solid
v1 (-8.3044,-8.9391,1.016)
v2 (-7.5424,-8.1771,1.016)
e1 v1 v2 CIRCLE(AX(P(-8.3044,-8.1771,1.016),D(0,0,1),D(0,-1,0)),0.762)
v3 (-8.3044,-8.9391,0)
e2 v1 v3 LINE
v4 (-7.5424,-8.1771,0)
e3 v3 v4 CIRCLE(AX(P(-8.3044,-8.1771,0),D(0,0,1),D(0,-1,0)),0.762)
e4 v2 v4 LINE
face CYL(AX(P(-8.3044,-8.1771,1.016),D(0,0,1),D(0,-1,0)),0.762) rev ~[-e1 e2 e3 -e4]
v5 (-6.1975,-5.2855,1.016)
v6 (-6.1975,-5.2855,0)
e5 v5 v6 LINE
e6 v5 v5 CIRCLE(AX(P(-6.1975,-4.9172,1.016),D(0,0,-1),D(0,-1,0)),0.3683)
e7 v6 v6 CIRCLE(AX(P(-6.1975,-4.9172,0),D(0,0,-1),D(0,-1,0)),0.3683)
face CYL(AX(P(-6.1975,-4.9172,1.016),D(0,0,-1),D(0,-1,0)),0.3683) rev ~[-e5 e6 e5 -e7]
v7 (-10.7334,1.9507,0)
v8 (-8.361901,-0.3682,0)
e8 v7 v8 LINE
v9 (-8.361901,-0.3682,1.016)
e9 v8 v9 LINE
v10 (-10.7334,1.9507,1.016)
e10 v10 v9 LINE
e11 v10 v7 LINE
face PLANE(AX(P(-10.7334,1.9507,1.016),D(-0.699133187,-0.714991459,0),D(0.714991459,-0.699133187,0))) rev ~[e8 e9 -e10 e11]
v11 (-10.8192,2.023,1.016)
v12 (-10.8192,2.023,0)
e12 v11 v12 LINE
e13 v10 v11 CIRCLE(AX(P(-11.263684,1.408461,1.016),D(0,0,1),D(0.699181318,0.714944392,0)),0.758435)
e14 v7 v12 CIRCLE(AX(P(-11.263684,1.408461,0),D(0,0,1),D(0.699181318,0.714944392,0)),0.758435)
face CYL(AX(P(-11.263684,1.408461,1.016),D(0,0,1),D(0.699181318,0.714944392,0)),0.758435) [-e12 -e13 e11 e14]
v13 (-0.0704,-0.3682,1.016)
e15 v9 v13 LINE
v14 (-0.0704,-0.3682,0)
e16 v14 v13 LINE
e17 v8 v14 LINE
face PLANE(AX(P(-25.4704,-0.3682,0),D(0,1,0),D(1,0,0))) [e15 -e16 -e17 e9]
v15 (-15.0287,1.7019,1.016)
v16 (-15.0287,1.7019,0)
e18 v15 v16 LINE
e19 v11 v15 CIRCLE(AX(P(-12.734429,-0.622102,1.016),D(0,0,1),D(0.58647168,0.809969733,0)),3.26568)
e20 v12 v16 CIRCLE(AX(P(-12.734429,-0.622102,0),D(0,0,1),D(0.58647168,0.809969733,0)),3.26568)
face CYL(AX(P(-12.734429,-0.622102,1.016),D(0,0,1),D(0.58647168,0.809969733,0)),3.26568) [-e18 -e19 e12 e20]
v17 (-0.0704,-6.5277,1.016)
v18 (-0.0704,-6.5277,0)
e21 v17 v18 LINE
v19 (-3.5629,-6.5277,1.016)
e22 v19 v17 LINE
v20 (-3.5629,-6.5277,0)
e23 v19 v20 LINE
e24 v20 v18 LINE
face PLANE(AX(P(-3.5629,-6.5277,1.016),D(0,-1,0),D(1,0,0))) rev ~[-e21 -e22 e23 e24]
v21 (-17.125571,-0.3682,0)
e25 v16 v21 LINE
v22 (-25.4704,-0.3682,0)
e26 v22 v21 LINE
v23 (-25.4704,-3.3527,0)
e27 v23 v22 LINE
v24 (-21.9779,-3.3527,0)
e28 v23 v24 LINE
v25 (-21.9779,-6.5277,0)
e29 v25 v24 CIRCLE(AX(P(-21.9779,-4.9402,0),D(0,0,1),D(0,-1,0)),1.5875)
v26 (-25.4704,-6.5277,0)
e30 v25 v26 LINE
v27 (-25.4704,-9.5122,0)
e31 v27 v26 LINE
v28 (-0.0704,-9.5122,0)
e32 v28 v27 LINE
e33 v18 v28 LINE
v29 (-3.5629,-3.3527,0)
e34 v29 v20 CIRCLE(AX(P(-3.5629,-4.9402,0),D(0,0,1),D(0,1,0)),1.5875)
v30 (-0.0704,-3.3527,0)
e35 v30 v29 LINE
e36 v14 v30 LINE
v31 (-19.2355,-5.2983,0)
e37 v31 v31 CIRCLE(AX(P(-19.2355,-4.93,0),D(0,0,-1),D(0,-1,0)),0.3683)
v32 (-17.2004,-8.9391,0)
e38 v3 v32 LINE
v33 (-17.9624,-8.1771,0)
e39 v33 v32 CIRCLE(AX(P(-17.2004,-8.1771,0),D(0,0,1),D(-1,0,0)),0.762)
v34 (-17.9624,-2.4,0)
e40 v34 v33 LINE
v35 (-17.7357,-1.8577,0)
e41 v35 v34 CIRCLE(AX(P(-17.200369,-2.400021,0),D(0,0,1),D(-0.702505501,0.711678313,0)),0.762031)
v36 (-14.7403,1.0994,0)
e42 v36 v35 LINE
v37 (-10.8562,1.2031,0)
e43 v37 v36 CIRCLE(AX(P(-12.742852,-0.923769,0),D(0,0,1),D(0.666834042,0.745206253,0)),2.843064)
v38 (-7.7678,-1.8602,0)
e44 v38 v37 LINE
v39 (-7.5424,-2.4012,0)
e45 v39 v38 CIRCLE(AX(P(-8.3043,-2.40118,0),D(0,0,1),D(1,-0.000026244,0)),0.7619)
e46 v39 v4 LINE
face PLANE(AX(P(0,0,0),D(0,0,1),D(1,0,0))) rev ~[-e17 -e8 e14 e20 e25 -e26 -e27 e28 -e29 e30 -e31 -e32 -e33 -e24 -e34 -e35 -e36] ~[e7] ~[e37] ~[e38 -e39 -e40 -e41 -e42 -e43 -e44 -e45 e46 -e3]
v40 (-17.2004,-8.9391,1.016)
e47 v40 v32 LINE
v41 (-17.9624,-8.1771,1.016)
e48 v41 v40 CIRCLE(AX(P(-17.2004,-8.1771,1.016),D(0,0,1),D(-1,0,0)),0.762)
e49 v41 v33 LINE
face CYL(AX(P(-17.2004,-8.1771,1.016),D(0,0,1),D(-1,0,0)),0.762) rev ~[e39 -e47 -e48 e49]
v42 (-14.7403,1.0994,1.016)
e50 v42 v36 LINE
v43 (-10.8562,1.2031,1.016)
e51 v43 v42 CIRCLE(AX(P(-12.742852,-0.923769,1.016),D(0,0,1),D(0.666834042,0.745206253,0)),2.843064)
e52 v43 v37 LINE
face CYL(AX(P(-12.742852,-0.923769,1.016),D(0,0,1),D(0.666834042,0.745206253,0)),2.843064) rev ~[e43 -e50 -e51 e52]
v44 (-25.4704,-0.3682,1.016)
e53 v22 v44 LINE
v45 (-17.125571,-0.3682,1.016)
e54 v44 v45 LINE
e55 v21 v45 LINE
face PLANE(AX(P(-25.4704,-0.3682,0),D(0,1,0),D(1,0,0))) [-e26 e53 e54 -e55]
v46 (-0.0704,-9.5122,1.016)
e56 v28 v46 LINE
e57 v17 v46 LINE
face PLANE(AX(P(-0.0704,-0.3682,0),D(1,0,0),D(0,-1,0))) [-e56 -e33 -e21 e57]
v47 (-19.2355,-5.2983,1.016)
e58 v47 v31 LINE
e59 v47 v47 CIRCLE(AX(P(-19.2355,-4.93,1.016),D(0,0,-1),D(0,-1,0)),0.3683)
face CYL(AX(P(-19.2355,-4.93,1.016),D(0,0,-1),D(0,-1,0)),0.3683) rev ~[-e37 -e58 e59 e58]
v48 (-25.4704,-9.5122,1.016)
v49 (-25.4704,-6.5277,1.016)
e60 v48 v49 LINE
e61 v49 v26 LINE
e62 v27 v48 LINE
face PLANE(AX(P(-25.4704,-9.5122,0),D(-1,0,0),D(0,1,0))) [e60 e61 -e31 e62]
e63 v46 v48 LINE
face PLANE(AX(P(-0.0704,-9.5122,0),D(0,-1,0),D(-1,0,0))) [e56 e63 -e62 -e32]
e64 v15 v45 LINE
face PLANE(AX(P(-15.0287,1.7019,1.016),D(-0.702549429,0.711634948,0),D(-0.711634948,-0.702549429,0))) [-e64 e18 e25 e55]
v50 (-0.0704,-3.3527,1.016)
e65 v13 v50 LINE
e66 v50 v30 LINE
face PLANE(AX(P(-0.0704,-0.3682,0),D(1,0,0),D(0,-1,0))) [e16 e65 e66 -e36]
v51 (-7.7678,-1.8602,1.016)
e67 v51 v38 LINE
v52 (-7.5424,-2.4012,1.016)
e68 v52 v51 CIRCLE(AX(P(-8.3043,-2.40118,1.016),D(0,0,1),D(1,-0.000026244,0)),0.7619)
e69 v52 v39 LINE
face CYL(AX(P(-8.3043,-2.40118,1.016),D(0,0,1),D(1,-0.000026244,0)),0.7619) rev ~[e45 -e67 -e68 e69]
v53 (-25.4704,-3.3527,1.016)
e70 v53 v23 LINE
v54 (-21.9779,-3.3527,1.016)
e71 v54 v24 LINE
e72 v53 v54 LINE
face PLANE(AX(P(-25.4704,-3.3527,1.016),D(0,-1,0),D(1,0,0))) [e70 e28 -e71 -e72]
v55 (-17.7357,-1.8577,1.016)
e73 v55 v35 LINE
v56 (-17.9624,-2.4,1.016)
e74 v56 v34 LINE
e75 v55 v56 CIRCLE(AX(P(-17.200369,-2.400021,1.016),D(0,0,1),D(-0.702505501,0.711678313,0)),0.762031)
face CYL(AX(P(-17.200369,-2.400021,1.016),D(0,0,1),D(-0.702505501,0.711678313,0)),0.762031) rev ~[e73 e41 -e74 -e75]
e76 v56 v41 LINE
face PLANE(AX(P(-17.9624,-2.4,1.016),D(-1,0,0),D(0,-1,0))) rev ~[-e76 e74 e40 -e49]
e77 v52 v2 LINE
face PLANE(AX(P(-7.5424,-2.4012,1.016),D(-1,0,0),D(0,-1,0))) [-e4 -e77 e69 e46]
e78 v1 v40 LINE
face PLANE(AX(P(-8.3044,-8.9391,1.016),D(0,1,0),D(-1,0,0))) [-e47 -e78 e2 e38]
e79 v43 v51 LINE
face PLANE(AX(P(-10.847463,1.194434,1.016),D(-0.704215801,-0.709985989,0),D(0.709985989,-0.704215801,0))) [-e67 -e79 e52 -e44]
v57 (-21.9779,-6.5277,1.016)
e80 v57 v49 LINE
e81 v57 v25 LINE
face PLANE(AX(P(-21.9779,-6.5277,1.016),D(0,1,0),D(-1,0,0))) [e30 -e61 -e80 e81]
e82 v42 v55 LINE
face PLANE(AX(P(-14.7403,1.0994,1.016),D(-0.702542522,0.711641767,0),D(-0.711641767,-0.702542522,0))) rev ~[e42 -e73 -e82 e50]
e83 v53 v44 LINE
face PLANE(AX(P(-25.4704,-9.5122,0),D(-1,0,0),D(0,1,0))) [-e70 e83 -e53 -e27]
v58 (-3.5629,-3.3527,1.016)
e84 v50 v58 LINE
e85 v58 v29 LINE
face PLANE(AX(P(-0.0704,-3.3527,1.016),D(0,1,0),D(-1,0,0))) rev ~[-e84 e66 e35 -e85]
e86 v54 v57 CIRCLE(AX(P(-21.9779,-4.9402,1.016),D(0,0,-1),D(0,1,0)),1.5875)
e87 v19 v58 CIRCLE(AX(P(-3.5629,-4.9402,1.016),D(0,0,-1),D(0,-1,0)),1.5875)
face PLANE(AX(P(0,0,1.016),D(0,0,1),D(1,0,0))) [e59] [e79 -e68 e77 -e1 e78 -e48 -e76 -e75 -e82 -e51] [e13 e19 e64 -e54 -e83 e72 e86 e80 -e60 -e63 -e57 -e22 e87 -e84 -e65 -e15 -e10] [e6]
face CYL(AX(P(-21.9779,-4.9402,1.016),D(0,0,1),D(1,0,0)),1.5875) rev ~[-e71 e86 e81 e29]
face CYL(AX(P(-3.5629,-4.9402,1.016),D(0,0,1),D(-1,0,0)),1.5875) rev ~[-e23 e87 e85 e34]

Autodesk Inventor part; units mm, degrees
ref_plane "YZ Plane" through (0, 0, 0) normal (1, 0, 0) x (0, 1, 0)
ref_plane "XZ Plane" through (0, 0, 0) normal (0, 1, 0) x (-1, 0, 0)
ref_plane "XY Plane" through (0, 0, 0) normal (0, 0, 1) x (1, 0, 0)
sketch "Block1" plane through (0, 0, 0) normal (0, 0, 1) x (1, 0, 0)
  line L0 (-17.5911, -8.406) -> (-17.5911, -2.6569)
  arc A0 (-15.6308, 0.6431) -> (-17.4939, -2.2845) centre (9.5285, -17.4245) ccw
  arc A1 (-17.4939, -2.2845) -> (-17.5911, -2.6569) centre (-16.8291, -2.6569) ccw
  line L1 (-13.0521, -3.6322) -> (-2.9855, -3.6322)
  line L2 (-2.9855, -3.6322) -> (-2.9855, -10.0136)
  line L3 (-2.9855, -10.0136) -> (-13.0521, -10.0136)
  line L4 (-13.0521, -10.0136) -> (-13.0521, -3.6322)
  ellipse E0 centre (-8.0188, -3.6322) end of major axis (-8.0188, -7.4704) minor radius 2.9685
  point P0 (-13.9703, -5.5207)
  point P1 (-17.5911, -2.4593)
  dimension "d111" = 0.762
sketch "Block2" plane through (0, 0, 0) normal (0, 0, 1) x (1, 0, 0)
  line L0 (-7.8958, -2.4967) -> (-7.8958, -8.4058)
  line L1 (-8.6339, -9.168) -> (-16.8291, -9.168)
  ellipse E0 centre (-12.6564, -2.1178) end of major axis (-12.6564, -6.4967) minor radius 3.853 (-9.6585, 0.6329) -> (-15.6415, 0.6509) ccw
  arc A0 (-7.8958, -2.4967) -> (-9.6091, 0.6391) centre (-35.8892, -15.7554) ccw
  line L2 (-17.6018, -8.3981) -> (-17.6018, -2.6491)
  arc A1 (-15.6415, 0.6509) -> (-17.5045, -2.2766) centre (9.5178, -17.4167) ccw
  arc A2 (-17.5045, -2.2766) -> (-17.6018, -2.6491) centre (-16.8398, -2.6491) ccw
  line L3 (-13.0627, -3.6243) -> (-2.9962, -3.6243)
  line L4 (-2.9962, -3.6243) -> (-2.9962, -10.0058)
  line L5 (-2.9962, -10.0058) -> (-13.0627, -10.0058)
  line L6 (-13.0627, -10.0058) -> (-13.0627, -3.6243)
  ellipse E1 centre (-8.0295, -3.6243) end of major axis (-8.0295, -7.4625) minor radius 2.9685
  point P0 (-12.2397, -5.1213)
sketch "Block3" plane through (0, 0, 0) normal (0, 0, 1) x (1, 0, 0)
  arc A0 (-17.5911, -8.406) -> (-16.8291, -9.168) centre (-16.8291, -8.406) ccw
  arc A1 (-8.6339, -9.168) -> (-7.8719, -8.406) centre (-8.6339, -8.406) ccw
  line L0 (-7.8958, -2.4967) -> (-7.8958, -8.4058)
  line L1 (-8.6339, -9.168) -> (-16.8291, -9.168)
  ellipse E0 centre (-12.6564, -2.1178) end of major axis (-12.6564, -6.4967) minor radius 3.853 (-9.6585, 0.6329) -> (-15.6415, 0.6509) ccw
  arc A2 (-7.8958, -2.4967) -> (-9.6091, 0.6391) centre (-35.8892, -15.7554) ccw
  line L2 (-17.6018, -8.3981) -> (-17.6018, -2.6491)
  arc A3 (-15.6415, 0.6509) -> (-17.5045, -2.2766) centre (9.5178, -17.4167) ccw
  arc A4 (-17.5045, -2.2766) -> (-17.6018, -2.6491) centre (-16.8398, -2.6491) ccw
  line L3 (-13.0627, -3.6243) -> (-2.9962, -3.6243)
  line L4 (-2.9962, -3.6243) -> (-2.9962, -10.0058)
  line L5 (-2.9962, -10.0058) -> (-13.0627, -10.0058)
  line L6 (-13.0627, -10.0058) -> (-13.0627, -3.6243)
  ellipse E1 centre (-8.0295, -3.6243) end of major axis (-8.0295, -7.4625) minor radius 2.9685
  point P0 (-12.6868, -8.3844)
  dimension "d110" = 0.762
sketch "Block4" plane through (0, 0, 0) normal (0, 0, 1) x (1, 0, 0)
  arc A0 (-17.5911, -8.406) -> (-16.8291, -9.168) centre (-16.8291, -8.406) ccw
  arc A1 (-8.6339, -9.168) -> (-7.8719, -8.406) centre (-8.6339, -8.406) ccw
  line L0 (-7.8958, -2.4967) -> (-7.8958, -8.4058)
  line L1 (-8.6339, -9.168) -> (-16.8291, -9.168)
  ellipse E0 centre (-12.6564, -2.1178) end of major axis (-12.6564, -6.4967) minor radius 3.853 (-9.6585, 0.6329) -> (-15.6415, 0.6509) ccw
  arc A2 (-7.8958, -2.4967) -> (-9.6091, 0.6391) centre (-35.8892, -15.7554) ccw
  line L2 (-17.6018, -8.3981) -> (-17.6018, -2.6491)
  arc A3 (-15.6415, 0.6509) -> (-17.5045, -2.2766) centre (9.5178, -17.4167) ccw
  arc A4 (-17.5045, -2.2766) -> (-17.6018, -2.6491) centre (-16.8398, -2.6491) ccw
  line L3 (-13.0627, -3.6243) -> (-2.9962, -3.6243)
  line L4 (-2.9962, -3.6243) -> (-2.9962, -10.0058)
  line L5 (-2.9962, -10.0058) -> (-13.0627, -10.0058)
  line L6 (-13.0627, -10.0058) -> (-13.0627, -3.6243)
  ellipse E1 centre (-8.0295, -3.6243) end of major axis (-8.0295, -7.4625) minor radius 2.9685
  point P0 (-12.6868, -8.3844)
sketch "Block5" plane through (0, 0, 0) normal (0, 0, 1) x (1, 0, 0)
  ellipse E0 centre (-12.7876, -1.8459) end of major axis (-12.7876, -5.6516) minor radius 3.3457 (-10.6846, 1.114) -> (-14.8941, 1.1109) ccw
  arc A0 (-15.6984, 0.3796) -> (-14.8859, 1.1184) centre (-85.8065, 78.298) ccw
  arc A1 (-10.6894, 1.1184) -> (-9.8669, 0.3716) centre (60.1779, 78.3469) ccw
  point P0 (-12.7899, 8.9309)
sketch "Block6" plane through (0, 0, 0) normal (0, 0, 1) x (1, 0, 0)
  arc A0 (-10.9697, 1.4333) -> (-15.1792, 1.1122) centre (-12.8849, -1.2117) ccw
  line L0 (-15.1792, 1.1122) -> (-17.7718, -1.4473)
  line L1 (-10.8839, 1.361) -> (-8.0119, -1.4473)
  line L2 (-17.7718, -1.4473) -> (-8.0119, -1.4473)
  arc A1 (-10.8839, 1.361) -> (-10.9697, 1.4333) centre (-11.4166, 0.8161) ccw
  point P0 (-12.0633, -0.3449)
  point P1 (-10.9214, 1.3977)
  dimension "d153" = 0.762
sketch "Sketch1" plane through (0, 0, 0) normal (0, 0, 1) x (1, 0, 0)
  line L0 (-25.4704, -0.3682) -> (-0.0704, -0.3682)
  line L1 (-0.0704, -0.3682) -> (-0.0704, -9.5122)
  line L2 (-0.0704, -9.5122) -> (-25.4704, -9.5122)
  line L3 (-25.4704, -9.5122) -> (-25.4704, -0.3682)
extrude "Extrusion1" add sketch "Sketch1" along normal blind 1.016
sketch "Sketch2" plane through (0, 0, 1.016) normal (0, 0, 1) x (1, 0, 0)
  line L0 (-15.6279, -1.8922) -> (-9.9129, -1.8922)
  line L1 (-8.3254, -3.4797) -> (-8.3254, -6.4007)
  line L2 (-9.9129, -7.9882) -> (-15.6279, -7.9882)
  line L3 (-17.2154, -6.4007) -> (-17.2154, -3.4797)
  arc A0 (-15.6279, -1.8922) -> (-17.2154, -3.4797) centre (-15.6279, -3.4797) ccw
  arc A1 (-17.2154, -6.4007) -> (-15.6279, -7.9882) centre (-15.6279, -6.4007) ccw
  arc A2 (-9.9129, -7.9882) -> (-8.3254, -6.4007) centre (-9.9129, -6.4007) ccw
  arc A3 (-8.3254, -3.4797) -> (-9.9129, -1.8922) centre (-9.9129, -3.4797) ccw
extrude "Extrusion2" cut sketch "Sketch2" against normal blind 1.016
sketch "Sketch3" plane through (0, 0, 1.016) normal (0, 0, 1) x (1, 0, 0)
  line L0 (-0.0704, -0.3682) -> (-0.0704, -9.5122) projected
  line L1 (-25.4704, -9.5122) -> (-25.4704, -0.3682) projected
  line L2 (-0.0704, -9.5122) -> (-25.4704, -9.5122) projected
  line L3 (-25.4704, -3.3527) -> (-21.9779, -3.3527)
  line L4 (-20.3904, -4.9402) -> (-20.3904, -4.9402)
  line L5 (-21.9779, -6.5277) -> (-25.4704, -6.5277)
  arc A0 (-20.3904, -4.9402) -> (-21.9779, -3.3527) centre (-21.9779, -4.9402) ccw
  arc A1 (-21.9779, -6.5277) -> (-20.3904, -4.9402) centre (-21.9779, -4.9402) ccw
  line L6 (-0.0704, -3.3527) -> (-3.5629, -3.3527)
  line L7 (-5.1504, -4.9402) -> (-5.1504, -4.9402)
  line L8 (-3.5629, -6.5277) -> (-0.0704, -6.5277)
  arc A2 (-3.5629, -3.3527) -> (-5.1504, -4.9402) centre (-3.5629, -4.9402) ccw
  arc A3 (-5.1504, -4.9402) -> (-3.5629, -6.5277) centre (-3.5629, -4.9402) ccw
extrude "Extrusion3" cut sketch "Sketch3" against normal blind 1.016
sketch "Sketch13" plane through (0, 0, 1.016) normal (0, 0, 1) x (1, 0, 0)
  arc A0 (-10.8192, 2.023) -> (-15.0287, 1.7019) centre (-12.7344, -0.622) ccw
  line L0 (-15.0287, 1.7019) -> (-17.6213, -0.8576)
  line L1 (-10.7334, 1.9507) -> (-7.8614, -0.8576)
  line L2 (-17.6213, -0.8576) -> (-7.8614, -0.8576)
  arc A1 (-10.7334, 1.9507) -> (-10.8192, 2.023) centre (-11.2661, 1.4058) ccw
  point P0 (0, 0)
  point P1 (0, 0)
  point P2 (0, 0)
extrude "Extrusion8" add sketch "Sketch13" against normal blind 1.016
sketch "Sketch12" plane through (0, 0, 1.016) normal (0, 0, 1) x (1, 0, 0)
  line L0 (-7.5424, -2.4012) -> (-7.5424, -8.1771)
  line L1 (-8.3044, -8.9391) -> (-17.2004, -8.9391)
  line L2 (-17.9624, -2.4) -> (-17.9624, -8.1771)
  arc A0 (-17.9624, -8.1771) -> (-17.2004, -8.9391) centre (-17.2004, -8.1771) ccw
  arc A1 (-8.3044, -8.9391) -> (-7.5424, -8.1771) centre (-8.3044, -8.1771) ccw
  line L3 (-10.8562, 1.2031) -> (-7.7678, -1.8602)
  line L4 (-14.7403, 1.0994) -> (-17.7357, -1.8577)
  arc A2 (-10.847, 1.1949) -> (-14.7403, 1.0994) centre (-12.7429, -0.9239) ccw
  arc A3 (-17.7357, -1.8577) -> (-17.9624, -2.4) centre (-17.2004, -2.4) ccw
  arc A4 (-7.5424, -2.4012) -> (-7.7678, -1.8602) centre (-8.3044, -2.4012) ccw
  point P0 (0, 0)
  point P1 (-17.1532, -8.9391)
  point P2 (-17.9624, -7.9131)
  point P3 (-7.5424, -8.1803)
  point P4 (-8.3956, -8.9391)
  point P5 (0, 0)
  point P6 (-17.6124, -1.736)
  point P7 (-17.9624, -2.2782)
  point P8 (-7.8931, -1.7359)
  point P9 (-7.5424, -2.2782)
  dimension "d149" = 0.762
  dimension "d150" = 0.762
  dimension "d154" = 0.762
extrude "Extrusion7" cut sketch "Sketch12" against normal blind 1.016
hole "Hole9" at (-19.2355, -4.93, 1.016) direction (0, 0, -1) diameter 0.7366 depth 1.524
hole "Hole10" at (-6.1975, -4.9172, 1.016) direction (0, 0, -1) diameter 0.7366 depth 2.794
properties part number "headplateLP_tapped"
